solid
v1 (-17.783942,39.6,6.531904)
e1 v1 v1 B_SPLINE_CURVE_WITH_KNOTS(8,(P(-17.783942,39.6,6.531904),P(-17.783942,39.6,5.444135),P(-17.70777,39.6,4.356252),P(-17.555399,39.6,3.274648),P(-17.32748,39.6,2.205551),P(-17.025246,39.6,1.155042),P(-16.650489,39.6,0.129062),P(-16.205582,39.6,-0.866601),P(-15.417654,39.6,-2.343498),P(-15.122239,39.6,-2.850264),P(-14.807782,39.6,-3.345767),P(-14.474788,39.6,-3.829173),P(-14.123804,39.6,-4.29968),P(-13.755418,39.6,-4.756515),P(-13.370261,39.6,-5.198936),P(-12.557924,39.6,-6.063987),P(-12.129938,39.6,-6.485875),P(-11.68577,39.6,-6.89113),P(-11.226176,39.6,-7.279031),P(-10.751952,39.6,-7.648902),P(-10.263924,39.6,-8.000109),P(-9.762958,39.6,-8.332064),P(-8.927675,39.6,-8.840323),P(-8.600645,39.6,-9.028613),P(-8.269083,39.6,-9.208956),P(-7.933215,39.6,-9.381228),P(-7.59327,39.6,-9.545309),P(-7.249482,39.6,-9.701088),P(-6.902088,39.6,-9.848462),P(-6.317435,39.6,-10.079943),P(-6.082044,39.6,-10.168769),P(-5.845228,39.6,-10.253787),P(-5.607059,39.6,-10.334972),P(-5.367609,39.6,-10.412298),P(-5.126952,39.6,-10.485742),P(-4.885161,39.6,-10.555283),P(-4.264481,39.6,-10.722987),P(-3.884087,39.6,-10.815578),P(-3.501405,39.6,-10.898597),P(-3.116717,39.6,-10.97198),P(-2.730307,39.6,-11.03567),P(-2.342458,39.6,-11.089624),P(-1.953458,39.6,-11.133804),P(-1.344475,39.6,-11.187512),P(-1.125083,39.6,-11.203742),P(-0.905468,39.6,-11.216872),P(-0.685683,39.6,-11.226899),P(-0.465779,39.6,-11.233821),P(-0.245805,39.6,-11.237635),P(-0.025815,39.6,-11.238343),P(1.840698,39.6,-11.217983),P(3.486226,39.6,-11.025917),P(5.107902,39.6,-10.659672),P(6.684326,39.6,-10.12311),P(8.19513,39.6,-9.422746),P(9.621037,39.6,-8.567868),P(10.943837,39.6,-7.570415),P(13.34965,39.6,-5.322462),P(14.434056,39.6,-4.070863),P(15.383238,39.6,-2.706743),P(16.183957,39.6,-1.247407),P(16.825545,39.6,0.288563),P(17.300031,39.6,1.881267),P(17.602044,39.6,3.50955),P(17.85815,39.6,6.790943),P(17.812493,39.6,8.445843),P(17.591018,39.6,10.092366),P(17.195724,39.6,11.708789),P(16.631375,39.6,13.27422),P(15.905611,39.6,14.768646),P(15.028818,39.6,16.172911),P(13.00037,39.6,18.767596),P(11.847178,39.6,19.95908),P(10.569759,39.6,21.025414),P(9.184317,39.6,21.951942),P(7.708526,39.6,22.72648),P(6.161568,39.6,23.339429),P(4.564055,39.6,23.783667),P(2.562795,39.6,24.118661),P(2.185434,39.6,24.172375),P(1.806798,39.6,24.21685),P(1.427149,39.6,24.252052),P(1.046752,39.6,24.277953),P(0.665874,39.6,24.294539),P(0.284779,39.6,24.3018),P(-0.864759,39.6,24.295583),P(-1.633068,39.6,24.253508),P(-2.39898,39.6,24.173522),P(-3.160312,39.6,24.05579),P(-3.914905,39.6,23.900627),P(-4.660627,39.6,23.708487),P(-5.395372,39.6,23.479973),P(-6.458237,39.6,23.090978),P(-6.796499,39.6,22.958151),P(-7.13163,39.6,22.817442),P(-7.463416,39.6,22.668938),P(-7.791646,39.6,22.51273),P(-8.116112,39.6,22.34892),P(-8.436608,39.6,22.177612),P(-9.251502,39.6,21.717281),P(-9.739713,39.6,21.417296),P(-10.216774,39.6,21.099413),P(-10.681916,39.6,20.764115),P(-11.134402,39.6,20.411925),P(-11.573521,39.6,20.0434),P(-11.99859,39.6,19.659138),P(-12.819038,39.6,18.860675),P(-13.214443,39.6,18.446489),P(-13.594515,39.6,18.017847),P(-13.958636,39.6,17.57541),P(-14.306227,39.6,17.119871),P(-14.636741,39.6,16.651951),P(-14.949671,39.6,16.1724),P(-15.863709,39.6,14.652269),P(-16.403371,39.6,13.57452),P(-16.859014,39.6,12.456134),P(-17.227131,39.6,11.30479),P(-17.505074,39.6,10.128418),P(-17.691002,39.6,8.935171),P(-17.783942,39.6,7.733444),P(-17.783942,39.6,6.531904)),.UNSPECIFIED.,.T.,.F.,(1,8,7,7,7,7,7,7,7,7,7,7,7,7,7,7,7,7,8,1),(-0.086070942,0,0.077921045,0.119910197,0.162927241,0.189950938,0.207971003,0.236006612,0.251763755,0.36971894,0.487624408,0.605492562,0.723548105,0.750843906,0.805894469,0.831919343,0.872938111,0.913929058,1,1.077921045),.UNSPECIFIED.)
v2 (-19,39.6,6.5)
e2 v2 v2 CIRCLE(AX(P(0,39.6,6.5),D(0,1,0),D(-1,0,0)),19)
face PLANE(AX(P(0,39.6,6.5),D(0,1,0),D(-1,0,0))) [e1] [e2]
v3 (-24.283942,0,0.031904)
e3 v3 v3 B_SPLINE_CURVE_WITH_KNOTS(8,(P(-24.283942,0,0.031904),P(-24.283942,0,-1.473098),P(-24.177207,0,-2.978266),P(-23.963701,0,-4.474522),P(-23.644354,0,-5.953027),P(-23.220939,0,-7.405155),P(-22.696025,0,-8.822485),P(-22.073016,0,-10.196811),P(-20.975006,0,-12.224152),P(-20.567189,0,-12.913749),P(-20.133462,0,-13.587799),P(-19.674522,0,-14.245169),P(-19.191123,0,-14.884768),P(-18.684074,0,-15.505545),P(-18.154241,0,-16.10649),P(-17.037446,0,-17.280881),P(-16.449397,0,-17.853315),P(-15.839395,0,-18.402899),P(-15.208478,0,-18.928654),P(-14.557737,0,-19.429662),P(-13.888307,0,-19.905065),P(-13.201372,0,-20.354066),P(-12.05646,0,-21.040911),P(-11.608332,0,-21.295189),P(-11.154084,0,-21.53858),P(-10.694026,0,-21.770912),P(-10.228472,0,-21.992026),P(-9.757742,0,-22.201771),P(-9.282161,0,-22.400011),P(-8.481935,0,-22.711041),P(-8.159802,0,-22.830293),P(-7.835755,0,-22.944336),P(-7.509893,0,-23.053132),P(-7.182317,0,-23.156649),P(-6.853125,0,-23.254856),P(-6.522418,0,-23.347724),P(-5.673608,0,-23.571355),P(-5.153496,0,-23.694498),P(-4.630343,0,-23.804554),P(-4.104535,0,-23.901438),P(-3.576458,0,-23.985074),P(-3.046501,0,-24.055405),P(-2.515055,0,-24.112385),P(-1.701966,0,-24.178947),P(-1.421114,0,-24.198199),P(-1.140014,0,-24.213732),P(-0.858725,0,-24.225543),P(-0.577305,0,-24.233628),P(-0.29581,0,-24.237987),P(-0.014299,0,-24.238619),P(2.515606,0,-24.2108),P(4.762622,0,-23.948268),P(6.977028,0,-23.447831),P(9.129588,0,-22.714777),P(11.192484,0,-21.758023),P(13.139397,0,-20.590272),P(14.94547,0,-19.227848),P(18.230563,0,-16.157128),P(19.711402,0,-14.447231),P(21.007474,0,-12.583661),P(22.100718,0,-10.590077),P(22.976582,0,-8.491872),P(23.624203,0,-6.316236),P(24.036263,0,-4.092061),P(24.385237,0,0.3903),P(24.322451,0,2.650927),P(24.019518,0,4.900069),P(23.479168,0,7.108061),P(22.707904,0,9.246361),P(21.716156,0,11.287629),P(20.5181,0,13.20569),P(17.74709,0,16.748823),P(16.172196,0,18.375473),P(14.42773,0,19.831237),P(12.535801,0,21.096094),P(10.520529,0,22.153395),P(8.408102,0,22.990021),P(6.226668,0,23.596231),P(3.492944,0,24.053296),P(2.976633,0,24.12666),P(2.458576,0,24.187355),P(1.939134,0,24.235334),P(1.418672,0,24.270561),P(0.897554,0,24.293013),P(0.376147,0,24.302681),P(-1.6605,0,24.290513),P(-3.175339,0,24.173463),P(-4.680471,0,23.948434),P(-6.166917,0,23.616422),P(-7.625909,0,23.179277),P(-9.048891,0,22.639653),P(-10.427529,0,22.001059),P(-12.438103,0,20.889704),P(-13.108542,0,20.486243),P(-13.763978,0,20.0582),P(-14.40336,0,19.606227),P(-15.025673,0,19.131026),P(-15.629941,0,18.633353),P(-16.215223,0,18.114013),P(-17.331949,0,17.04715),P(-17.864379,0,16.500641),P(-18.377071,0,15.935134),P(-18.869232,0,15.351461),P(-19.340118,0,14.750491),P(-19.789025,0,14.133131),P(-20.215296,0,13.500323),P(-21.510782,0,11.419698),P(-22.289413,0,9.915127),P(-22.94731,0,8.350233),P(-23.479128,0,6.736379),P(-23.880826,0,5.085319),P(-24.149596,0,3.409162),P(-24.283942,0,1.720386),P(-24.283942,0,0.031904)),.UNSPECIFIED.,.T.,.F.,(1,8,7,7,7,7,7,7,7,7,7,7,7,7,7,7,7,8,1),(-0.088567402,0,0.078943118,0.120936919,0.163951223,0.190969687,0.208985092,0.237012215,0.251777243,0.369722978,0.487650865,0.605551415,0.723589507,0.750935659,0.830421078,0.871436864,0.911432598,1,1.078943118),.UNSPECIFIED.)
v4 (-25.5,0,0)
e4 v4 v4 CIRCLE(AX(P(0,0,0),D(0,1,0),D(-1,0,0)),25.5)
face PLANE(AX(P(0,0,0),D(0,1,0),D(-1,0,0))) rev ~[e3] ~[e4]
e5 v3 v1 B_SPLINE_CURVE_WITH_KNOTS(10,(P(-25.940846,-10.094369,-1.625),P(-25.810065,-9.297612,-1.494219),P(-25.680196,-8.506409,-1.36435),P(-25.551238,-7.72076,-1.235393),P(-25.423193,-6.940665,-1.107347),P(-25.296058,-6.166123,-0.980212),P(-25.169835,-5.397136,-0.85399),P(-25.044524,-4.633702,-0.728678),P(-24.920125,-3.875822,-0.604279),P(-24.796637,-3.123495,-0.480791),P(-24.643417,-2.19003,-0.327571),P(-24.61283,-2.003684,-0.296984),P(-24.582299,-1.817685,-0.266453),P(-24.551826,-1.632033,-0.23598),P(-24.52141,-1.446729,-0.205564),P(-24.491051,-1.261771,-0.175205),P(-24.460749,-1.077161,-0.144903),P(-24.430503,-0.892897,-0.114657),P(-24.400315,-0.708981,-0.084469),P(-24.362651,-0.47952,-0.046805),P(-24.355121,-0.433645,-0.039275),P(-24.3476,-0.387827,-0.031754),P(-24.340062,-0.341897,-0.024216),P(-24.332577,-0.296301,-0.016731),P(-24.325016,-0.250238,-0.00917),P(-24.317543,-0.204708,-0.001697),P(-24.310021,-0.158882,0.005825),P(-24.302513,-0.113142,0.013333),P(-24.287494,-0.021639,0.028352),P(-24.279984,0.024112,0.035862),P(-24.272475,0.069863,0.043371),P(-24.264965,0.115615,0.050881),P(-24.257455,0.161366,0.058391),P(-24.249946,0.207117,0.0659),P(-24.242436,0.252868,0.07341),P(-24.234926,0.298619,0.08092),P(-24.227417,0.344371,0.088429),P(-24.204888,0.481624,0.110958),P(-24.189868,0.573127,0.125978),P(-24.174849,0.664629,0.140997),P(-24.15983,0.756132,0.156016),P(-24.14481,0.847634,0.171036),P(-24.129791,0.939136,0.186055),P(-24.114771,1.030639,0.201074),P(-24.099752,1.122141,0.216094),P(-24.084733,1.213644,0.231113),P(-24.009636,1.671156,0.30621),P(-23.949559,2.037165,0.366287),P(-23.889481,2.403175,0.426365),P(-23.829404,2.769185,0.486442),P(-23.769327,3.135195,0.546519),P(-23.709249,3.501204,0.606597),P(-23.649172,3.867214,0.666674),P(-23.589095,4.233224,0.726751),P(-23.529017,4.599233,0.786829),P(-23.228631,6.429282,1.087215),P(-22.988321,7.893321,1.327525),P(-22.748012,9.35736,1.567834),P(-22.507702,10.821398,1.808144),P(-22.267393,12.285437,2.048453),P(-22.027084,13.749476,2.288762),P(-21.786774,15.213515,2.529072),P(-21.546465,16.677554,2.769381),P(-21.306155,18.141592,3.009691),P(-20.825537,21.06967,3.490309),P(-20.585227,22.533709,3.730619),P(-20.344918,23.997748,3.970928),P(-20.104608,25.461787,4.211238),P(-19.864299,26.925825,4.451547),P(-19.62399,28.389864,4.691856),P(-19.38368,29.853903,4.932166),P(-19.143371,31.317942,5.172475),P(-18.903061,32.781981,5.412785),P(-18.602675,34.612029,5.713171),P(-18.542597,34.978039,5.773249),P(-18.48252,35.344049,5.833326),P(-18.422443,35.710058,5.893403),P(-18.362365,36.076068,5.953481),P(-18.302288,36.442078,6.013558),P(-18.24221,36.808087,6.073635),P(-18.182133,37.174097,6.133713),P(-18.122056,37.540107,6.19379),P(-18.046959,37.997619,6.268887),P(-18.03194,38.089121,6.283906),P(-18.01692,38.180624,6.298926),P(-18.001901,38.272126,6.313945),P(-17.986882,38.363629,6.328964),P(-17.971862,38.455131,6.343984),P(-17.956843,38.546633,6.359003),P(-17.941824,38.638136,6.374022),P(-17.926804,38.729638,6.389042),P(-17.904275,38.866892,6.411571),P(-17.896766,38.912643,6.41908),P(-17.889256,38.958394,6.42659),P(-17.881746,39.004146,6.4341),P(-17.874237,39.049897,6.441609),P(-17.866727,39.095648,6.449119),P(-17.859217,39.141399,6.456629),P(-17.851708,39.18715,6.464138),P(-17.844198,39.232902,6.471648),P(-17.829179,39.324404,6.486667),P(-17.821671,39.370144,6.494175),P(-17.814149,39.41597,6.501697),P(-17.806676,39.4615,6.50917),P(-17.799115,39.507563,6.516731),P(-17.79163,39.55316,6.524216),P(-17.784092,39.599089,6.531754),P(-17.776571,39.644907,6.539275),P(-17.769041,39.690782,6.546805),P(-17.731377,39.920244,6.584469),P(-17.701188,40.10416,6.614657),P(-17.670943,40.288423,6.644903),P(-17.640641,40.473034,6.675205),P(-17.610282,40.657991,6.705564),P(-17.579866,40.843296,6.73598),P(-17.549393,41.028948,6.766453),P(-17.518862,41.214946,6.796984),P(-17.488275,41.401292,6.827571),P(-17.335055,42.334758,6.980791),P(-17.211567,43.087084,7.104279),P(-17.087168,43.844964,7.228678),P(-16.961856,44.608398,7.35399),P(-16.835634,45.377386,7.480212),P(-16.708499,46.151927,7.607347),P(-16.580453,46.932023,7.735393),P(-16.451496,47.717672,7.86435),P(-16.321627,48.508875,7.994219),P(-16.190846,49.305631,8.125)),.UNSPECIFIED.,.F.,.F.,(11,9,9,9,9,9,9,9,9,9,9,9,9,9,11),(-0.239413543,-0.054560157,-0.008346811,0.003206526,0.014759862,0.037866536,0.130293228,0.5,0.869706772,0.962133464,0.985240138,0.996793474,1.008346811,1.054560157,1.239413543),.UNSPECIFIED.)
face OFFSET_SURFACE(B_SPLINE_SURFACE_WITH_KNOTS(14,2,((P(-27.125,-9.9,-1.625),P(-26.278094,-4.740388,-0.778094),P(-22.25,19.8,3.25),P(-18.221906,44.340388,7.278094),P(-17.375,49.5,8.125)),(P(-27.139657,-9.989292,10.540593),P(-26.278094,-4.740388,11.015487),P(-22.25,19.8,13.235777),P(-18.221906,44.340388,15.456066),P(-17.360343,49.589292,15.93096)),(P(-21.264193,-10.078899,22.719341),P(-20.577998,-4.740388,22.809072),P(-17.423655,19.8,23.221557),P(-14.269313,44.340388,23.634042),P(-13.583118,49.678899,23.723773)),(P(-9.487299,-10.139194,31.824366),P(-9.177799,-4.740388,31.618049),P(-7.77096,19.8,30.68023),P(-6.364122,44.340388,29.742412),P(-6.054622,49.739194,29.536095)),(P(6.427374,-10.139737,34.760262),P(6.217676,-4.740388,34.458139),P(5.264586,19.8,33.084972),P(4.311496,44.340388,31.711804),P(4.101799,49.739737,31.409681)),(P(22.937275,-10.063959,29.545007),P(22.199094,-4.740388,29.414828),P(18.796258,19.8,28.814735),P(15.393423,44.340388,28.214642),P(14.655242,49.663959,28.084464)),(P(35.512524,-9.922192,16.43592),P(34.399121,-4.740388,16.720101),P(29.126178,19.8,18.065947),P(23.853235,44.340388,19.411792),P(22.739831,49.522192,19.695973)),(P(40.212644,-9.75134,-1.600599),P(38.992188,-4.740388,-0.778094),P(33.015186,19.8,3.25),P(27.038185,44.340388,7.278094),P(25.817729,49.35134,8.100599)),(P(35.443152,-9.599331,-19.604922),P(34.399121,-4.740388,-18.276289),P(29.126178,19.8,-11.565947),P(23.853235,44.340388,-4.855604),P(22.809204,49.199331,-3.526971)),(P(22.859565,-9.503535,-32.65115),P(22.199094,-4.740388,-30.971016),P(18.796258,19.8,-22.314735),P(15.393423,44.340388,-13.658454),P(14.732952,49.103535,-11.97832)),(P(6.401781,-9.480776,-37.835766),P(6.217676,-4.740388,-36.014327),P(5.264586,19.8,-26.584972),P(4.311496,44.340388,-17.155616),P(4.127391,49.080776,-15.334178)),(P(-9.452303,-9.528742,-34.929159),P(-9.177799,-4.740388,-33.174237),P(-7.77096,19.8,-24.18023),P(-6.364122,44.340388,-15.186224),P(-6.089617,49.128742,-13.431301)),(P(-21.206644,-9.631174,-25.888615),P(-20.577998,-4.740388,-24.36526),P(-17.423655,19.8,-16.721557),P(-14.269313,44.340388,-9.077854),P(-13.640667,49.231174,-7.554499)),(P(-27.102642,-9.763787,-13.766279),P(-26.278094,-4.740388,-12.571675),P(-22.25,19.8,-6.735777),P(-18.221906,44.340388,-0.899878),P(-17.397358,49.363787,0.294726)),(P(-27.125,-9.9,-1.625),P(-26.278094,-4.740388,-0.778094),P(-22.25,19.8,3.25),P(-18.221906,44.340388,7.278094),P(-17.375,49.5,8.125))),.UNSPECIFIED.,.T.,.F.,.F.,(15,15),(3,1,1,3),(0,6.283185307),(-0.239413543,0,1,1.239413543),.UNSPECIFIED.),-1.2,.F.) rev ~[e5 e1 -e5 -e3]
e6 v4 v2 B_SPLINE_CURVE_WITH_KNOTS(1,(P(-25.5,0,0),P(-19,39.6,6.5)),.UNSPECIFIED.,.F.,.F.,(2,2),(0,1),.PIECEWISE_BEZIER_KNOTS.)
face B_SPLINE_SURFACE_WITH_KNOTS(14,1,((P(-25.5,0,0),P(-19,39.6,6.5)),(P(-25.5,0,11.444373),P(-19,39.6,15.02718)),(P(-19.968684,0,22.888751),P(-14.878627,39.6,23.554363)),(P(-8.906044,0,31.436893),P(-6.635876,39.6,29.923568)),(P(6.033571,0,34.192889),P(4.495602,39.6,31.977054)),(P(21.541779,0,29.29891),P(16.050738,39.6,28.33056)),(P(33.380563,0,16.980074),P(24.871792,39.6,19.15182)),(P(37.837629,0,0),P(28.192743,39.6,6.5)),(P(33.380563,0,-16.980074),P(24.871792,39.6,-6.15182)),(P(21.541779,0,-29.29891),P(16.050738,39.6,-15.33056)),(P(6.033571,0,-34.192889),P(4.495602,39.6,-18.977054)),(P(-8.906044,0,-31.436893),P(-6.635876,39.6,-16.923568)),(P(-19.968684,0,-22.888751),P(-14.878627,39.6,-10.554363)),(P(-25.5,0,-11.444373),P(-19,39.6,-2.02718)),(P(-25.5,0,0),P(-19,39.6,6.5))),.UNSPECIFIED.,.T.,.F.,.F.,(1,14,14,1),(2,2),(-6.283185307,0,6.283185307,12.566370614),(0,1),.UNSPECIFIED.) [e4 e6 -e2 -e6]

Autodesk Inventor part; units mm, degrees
ref_plane "YZ Plane" through (0, 0, 0) normal (1, 0, 0) x (0, 1, 0)
ref_plane "XY Plane" through (0, 0, 0) normal (0, 0, 1) x (1, 0, 0)
sketch "Szkic6" plane through (0, 0, 0) normal (0, 1, 0) x (-1, 0, 0)
  circle A0 centre (0, 0) radius 25.5
  dimension "d33" = 51
ref_plane "Płaszczyzna konstrukcyjna1" through (0, 39.6, 0) normal (0, 1, 0) x (-1, 0, 0)
sketch "Szkic7" plane through (0, 39.6, 0) normal (0, 1, 0) x (-1, 0, 0)
  circle A0 centre (0, 6.5) radius 19
  line L0 (0, -20.3) -> (0, 20.3) construction
  circle A1 centre (0, 0) radius 25.5 construction
  dimension "d35" = 38
loft "Wyciągnięcie złożone1" add profiles "Szkic6", "Szkic7"
shell "Skorupa1" thickness 1.2 removed faces 2 at (-4.1255, 39.6, 3.1914) at (4.5479, 0, -4.6843)
equation "\"d33\" = OD1"
equation "\"d35\" = OD2"
equation "\"d52\" = THK"
equation "\"SzerokośćGięciaPodcięcia\" = Grubość"
equation "\"RozmiarPodcięciaNarożnika\" = 4 * Grubość"
equation "\"PromieńPrzejścia\" = PromieńGięcia"
equation "\"Rozmiar_promienia_Jacobiego\" = PromieńGięcia"
equation "\"Wielk_odstępu\" = Grubość"
equation "\"d2\" = PromieńGięcia"
equation "\"d23\" = PromieńGięcia"
equation "\"OD1\" = 51"
equation "\"OD2\" = 38"
equation "\"L\" = 39.6"
equation "\"THK\" = 1.2"
equation "\"d34\" = L"
equation "\"Grubość\" = 1.5"
equation "\"PromieńGięcia\" = 3"
properties part number "Redukcja asymetryczna Ø51x38x1,2 L=39,6" material "304"
